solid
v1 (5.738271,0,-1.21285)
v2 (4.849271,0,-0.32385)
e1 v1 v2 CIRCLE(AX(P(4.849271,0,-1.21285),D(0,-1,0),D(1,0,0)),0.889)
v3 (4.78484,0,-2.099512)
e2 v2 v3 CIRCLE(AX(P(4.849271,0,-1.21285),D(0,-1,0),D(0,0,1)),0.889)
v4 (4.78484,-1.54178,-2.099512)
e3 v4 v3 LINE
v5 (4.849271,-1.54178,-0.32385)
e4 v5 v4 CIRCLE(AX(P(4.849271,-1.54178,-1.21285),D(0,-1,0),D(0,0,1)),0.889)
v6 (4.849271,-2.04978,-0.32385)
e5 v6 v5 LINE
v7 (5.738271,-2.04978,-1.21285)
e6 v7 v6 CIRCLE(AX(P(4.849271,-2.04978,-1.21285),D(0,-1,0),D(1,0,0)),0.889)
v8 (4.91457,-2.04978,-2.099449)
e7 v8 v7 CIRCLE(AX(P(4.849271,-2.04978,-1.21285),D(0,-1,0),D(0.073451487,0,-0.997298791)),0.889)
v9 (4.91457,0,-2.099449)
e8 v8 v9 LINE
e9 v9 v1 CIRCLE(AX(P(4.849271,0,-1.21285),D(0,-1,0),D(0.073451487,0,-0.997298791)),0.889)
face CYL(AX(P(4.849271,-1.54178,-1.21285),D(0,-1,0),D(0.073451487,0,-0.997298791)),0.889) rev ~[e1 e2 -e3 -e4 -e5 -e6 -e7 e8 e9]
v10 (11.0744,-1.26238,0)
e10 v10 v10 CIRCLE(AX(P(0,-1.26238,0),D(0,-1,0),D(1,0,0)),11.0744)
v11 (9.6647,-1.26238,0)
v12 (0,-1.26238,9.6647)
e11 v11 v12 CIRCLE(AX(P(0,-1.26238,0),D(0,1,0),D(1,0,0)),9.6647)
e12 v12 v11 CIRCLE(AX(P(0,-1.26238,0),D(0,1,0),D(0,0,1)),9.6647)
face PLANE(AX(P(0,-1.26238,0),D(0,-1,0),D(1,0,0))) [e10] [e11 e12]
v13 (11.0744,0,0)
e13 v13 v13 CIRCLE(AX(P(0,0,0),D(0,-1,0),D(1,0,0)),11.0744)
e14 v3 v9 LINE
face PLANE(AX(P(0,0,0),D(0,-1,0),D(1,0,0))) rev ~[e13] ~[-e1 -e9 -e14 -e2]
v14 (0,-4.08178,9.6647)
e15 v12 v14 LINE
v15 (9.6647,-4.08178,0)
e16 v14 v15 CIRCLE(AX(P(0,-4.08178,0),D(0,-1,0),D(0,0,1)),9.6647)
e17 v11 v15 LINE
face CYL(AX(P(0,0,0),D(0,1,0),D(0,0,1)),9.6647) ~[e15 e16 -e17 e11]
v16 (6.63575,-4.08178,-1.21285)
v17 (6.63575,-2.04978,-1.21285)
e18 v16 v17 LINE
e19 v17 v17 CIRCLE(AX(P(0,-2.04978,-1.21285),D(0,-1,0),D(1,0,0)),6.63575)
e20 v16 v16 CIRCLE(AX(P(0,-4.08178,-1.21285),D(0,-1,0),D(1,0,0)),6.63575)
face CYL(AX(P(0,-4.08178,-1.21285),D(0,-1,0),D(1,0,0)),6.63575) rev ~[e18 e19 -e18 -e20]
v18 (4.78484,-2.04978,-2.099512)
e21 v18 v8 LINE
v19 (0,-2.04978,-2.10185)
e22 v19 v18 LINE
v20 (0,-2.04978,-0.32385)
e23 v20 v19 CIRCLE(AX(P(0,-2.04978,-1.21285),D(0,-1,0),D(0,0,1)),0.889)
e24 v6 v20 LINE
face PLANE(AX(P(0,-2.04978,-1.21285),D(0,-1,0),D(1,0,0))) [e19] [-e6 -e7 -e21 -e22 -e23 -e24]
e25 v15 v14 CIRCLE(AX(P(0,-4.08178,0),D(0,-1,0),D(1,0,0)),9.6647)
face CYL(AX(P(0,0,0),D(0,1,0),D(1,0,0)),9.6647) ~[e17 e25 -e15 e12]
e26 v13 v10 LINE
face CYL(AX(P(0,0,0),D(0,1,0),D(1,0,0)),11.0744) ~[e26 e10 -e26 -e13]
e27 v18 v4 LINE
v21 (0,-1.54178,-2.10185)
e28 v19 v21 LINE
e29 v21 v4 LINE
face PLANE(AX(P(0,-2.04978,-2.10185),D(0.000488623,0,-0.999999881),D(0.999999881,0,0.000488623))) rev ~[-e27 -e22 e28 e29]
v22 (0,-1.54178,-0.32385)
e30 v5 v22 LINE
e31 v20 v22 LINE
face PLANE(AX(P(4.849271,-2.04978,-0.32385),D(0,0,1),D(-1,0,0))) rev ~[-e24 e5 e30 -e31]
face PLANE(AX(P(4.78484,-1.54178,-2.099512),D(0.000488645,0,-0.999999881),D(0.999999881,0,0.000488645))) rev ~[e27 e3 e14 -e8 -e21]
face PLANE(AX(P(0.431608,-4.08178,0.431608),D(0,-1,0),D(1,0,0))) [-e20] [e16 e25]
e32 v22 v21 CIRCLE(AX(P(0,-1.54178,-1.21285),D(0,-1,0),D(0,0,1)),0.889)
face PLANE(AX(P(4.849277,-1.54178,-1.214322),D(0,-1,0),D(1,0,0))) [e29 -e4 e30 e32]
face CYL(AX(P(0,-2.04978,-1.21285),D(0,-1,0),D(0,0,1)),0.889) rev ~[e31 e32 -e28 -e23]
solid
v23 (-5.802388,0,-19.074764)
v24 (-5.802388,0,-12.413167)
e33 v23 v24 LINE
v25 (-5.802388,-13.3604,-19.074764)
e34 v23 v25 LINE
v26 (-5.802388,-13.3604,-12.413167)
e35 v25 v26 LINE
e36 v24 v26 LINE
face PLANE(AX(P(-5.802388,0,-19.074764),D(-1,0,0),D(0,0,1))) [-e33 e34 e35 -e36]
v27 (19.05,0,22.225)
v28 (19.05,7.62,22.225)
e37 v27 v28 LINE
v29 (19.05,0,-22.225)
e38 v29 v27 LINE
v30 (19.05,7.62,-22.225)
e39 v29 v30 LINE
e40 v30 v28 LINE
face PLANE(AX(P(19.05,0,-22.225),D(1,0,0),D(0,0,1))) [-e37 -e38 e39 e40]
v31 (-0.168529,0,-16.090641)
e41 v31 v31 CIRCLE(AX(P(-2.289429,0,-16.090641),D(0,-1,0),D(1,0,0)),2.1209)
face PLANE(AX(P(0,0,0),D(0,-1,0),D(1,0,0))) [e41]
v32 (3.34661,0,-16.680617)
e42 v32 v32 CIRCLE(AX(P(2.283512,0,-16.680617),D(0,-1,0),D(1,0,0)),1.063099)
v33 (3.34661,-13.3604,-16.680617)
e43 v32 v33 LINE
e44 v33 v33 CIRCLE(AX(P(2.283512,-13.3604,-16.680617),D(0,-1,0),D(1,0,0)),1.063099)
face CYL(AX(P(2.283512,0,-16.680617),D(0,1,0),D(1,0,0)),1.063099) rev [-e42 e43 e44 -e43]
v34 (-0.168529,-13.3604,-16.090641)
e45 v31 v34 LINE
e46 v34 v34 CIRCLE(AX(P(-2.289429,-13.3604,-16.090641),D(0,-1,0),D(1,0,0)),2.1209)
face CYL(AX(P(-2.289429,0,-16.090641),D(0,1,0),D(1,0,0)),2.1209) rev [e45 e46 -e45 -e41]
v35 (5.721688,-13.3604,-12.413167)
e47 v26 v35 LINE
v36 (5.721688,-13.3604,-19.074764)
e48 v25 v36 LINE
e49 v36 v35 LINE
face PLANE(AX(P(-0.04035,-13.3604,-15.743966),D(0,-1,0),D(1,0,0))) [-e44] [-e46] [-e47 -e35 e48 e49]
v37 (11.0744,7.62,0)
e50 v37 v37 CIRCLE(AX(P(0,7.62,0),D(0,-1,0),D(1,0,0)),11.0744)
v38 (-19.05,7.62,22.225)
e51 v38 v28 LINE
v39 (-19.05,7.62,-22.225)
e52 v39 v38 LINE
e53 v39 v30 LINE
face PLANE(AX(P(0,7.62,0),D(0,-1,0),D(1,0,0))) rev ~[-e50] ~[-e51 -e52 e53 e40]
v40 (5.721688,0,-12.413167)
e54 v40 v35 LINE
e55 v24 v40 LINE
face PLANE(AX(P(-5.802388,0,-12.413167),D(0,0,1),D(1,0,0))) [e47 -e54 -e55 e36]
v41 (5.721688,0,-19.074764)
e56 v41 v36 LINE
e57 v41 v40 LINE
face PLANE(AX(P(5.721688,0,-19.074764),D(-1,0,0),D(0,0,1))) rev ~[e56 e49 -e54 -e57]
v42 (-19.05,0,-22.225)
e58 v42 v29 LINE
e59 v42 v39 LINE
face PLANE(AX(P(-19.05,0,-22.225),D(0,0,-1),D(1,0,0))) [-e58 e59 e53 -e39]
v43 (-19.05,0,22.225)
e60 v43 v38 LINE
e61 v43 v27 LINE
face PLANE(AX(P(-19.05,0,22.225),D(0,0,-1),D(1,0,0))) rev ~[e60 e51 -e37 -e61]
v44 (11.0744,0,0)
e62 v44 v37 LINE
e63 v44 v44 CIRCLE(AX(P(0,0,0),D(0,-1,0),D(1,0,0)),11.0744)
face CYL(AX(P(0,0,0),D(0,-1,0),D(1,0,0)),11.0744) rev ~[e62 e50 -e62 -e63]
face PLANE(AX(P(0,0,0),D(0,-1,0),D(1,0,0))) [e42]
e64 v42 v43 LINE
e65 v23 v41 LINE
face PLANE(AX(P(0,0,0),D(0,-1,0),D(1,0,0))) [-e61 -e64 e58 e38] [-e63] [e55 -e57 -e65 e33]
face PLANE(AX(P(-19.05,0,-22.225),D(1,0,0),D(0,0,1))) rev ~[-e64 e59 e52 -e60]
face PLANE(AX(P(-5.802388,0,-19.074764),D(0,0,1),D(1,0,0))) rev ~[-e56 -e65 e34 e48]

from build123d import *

# Parameters (mm, degrees)
F1_DEPTH  = 4.08178
F0_R      = 11.0744
F2_DEPTH  = 1.26238
F3_R      = 6.63575
F4_DEPTH  = 2.032
F6_DEPTH  = 0.508
F0_W      = 38.1
F0_H      = 44.45
F7_DEPTH  = 7.62
F9_DEPTH  = 27.94
F11_W     = 11.5240756422
F11_H     = 6.661596708
F11_R     = 2.1209
F11_R_2   = 1.0630985687
F12_DEPTH = 13.3604


# Not quite as in the source:
# - ends of sketch curves that miss each other by under 0.0002 mm in the source are joined


with BuildPart() as f1:
    # F0 (on Front) → F1 (new body)
    with BuildSketch(Plane.XZ):
        with BuildLine():
            ThreePointArc((0, 9.6647), (-6.8339749081, -6.8339749081), (9.6647, 0))
            ThreePointArc((9.6647, 0), (6.8339749081, 6.8339749081), (0, 9.6647))
        make_face()
        with BuildLine():
            ThreePointArc((6.63575, -1.21285), (-4.6921838233, -5.9050338233), (0, 5.4229))
            ThreePointArc((0, 5.4229), (4.6921838233, 3.4793338233), (6.63575, -1.21285))
        make_face(mode=Mode.SUBTRACT)
        with BuildLine():
            ThreePointArc((6.63575, -1.21285), (4.6921838233, 3.4793338233), (0, 5.4229))
            ThreePointArc((0, 5.4229), (-4.6921838233, -5.9050338233), (6.63575, -1.21285))
        make_face()
    extrude(amount=F1_DEPTH)

    # F0 (on Front) → F2 (join)
    with BuildSketch(Plane.XZ):
        Circle(F0_R)
        with BuildLine():
            ThreePointArc((0, 9.6647), (6.8339749081, 6.8339749081), (9.6647, 0))
            ThreePointArc((9.6647, 0), (-6.8339749081, -6.8339749081), (0, 9.6647))
        make_face(mode=Mode.SUBTRACT)
    extrude(amount=F2_DEPTH)

    # F3 (on face) → F4 (cut)
    with BuildSketch(Plane.XZ.offset(4.08178)):
        with Locations((0, -1.21285)):
            Circle(F3_R)
    extrude(amount=-F4_DEPTH, mode=Mode.SUBTRACT)

    # F5 (on face) → F6 (cut)
    with BuildSketch(Plane.XZ.offset(2.04978)):
        with BuildLine():
            ThreePointArc((4.8492713831, -0.32385), (4.2206534547, -0.5842320715), (3.9602713831, -1.21285))
            ThreePointArc((3.9602713831, -1.21285), (4.1982717908, -1.818259391), (4.7848395063, -2.0995120175))
            Line((4.7848395063, -2.0995120175), (4.9145697552, -2.0994486254))
            ThreePointArc((4.9145697552, -2.0994486254), (5.5005667281, -1.817941211), (5.7382713831, -1.21285))
            ThreePointArc((5.7382713831, -1.21285), (5.4778893116, -0.5842320715), (4.8492713831, -0.32385))
        make_face()
        with BuildLine():
            ThreePointArc((0, -0.32385), (0.6286179285, -0.5842320715), (0.889, -1.21285))
            Line((0.889, -1.21285), (3.9602713831, -1.21285))
            ThreePointArc((3.9602713831, -1.21285), (4.2206534547, -0.5842320715), (4.8492713831, -0.32385))
            Line((4.8492713831, -0.32385), (0, -0.32385))
        make_face()
        with BuildLine():
            Line((3.9602713831, -1.21285), (0.889, -1.21285))
            ThreePointArc((0.889, -1.21285), (0.6286179285, -0.5842320715), (0, -0.32385))
            ThreePointArc((0, -0.32385), (-0.889, -1.21285), (0, -2.10185))
            Line((0, -2.10185), (4.7848395063, -2.0995120175))
            ThreePointArc((4.7848395063, -2.0995120175), (4.1982717908, -1.818259391), (3.9602713831, -1.21285))
        make_face()
    extrude(amount=-F6_DEPTH, mode=Mode.SUBTRACT)

    # F8 (on face) → F9 (cut)
    with BuildSketch(Plane.XZ.offset(1.54178)):
        with BuildLine():
            Line((4.7848395063, -2.0995120175), (4.9145697552, -2.0994486254))
            ThreePointArc((4.9145697552, -2.0994486254), (5.5005667281, -1.817941211), (5.7382713831, -1.21285))
            ThreePointArc((5.7382713831, -1.21285), (5.4778893116, -0.5842320715), (4.8492713831, -0.32385))
            ThreePointArc((4.8492713831, -0.32385), (3.960856071, -1.1806128595), (4.7848395063, -2.0995120175))
        make_face()
    extrude(amount=-F9_DEPTH, mode=Mode.SUBTRACT)


with BuildPart() as f7:
    # F0 (on Front) → F7 (new body)
    with BuildSketch(Plane.XZ):
        Rectangle(F0_W, F0_H)
        Circle(F0_R, mode=Mode.SUBTRACT)
    extrude(amount=-F7_DEPTH)

    # F11 (on face) → F12 (join)
    with BuildSketch(Plane.XZ):
        with Locations((-0.0403500162, -15.7439657487)):
            Rectangle(F11_W, F11_H)
        with Locations((-2.289429307, -16.0906407982)):
            Circle(F11_R, mode=Mode.SUBTRACT)
        with Locations((2.2835119162, -16.6806168854)):
            Circle(F11_R_2, mode=Mode.SUBTRACT)
    extrude(amount=F12_DEPTH)


solid = Compound([f1.part, f7.part])
